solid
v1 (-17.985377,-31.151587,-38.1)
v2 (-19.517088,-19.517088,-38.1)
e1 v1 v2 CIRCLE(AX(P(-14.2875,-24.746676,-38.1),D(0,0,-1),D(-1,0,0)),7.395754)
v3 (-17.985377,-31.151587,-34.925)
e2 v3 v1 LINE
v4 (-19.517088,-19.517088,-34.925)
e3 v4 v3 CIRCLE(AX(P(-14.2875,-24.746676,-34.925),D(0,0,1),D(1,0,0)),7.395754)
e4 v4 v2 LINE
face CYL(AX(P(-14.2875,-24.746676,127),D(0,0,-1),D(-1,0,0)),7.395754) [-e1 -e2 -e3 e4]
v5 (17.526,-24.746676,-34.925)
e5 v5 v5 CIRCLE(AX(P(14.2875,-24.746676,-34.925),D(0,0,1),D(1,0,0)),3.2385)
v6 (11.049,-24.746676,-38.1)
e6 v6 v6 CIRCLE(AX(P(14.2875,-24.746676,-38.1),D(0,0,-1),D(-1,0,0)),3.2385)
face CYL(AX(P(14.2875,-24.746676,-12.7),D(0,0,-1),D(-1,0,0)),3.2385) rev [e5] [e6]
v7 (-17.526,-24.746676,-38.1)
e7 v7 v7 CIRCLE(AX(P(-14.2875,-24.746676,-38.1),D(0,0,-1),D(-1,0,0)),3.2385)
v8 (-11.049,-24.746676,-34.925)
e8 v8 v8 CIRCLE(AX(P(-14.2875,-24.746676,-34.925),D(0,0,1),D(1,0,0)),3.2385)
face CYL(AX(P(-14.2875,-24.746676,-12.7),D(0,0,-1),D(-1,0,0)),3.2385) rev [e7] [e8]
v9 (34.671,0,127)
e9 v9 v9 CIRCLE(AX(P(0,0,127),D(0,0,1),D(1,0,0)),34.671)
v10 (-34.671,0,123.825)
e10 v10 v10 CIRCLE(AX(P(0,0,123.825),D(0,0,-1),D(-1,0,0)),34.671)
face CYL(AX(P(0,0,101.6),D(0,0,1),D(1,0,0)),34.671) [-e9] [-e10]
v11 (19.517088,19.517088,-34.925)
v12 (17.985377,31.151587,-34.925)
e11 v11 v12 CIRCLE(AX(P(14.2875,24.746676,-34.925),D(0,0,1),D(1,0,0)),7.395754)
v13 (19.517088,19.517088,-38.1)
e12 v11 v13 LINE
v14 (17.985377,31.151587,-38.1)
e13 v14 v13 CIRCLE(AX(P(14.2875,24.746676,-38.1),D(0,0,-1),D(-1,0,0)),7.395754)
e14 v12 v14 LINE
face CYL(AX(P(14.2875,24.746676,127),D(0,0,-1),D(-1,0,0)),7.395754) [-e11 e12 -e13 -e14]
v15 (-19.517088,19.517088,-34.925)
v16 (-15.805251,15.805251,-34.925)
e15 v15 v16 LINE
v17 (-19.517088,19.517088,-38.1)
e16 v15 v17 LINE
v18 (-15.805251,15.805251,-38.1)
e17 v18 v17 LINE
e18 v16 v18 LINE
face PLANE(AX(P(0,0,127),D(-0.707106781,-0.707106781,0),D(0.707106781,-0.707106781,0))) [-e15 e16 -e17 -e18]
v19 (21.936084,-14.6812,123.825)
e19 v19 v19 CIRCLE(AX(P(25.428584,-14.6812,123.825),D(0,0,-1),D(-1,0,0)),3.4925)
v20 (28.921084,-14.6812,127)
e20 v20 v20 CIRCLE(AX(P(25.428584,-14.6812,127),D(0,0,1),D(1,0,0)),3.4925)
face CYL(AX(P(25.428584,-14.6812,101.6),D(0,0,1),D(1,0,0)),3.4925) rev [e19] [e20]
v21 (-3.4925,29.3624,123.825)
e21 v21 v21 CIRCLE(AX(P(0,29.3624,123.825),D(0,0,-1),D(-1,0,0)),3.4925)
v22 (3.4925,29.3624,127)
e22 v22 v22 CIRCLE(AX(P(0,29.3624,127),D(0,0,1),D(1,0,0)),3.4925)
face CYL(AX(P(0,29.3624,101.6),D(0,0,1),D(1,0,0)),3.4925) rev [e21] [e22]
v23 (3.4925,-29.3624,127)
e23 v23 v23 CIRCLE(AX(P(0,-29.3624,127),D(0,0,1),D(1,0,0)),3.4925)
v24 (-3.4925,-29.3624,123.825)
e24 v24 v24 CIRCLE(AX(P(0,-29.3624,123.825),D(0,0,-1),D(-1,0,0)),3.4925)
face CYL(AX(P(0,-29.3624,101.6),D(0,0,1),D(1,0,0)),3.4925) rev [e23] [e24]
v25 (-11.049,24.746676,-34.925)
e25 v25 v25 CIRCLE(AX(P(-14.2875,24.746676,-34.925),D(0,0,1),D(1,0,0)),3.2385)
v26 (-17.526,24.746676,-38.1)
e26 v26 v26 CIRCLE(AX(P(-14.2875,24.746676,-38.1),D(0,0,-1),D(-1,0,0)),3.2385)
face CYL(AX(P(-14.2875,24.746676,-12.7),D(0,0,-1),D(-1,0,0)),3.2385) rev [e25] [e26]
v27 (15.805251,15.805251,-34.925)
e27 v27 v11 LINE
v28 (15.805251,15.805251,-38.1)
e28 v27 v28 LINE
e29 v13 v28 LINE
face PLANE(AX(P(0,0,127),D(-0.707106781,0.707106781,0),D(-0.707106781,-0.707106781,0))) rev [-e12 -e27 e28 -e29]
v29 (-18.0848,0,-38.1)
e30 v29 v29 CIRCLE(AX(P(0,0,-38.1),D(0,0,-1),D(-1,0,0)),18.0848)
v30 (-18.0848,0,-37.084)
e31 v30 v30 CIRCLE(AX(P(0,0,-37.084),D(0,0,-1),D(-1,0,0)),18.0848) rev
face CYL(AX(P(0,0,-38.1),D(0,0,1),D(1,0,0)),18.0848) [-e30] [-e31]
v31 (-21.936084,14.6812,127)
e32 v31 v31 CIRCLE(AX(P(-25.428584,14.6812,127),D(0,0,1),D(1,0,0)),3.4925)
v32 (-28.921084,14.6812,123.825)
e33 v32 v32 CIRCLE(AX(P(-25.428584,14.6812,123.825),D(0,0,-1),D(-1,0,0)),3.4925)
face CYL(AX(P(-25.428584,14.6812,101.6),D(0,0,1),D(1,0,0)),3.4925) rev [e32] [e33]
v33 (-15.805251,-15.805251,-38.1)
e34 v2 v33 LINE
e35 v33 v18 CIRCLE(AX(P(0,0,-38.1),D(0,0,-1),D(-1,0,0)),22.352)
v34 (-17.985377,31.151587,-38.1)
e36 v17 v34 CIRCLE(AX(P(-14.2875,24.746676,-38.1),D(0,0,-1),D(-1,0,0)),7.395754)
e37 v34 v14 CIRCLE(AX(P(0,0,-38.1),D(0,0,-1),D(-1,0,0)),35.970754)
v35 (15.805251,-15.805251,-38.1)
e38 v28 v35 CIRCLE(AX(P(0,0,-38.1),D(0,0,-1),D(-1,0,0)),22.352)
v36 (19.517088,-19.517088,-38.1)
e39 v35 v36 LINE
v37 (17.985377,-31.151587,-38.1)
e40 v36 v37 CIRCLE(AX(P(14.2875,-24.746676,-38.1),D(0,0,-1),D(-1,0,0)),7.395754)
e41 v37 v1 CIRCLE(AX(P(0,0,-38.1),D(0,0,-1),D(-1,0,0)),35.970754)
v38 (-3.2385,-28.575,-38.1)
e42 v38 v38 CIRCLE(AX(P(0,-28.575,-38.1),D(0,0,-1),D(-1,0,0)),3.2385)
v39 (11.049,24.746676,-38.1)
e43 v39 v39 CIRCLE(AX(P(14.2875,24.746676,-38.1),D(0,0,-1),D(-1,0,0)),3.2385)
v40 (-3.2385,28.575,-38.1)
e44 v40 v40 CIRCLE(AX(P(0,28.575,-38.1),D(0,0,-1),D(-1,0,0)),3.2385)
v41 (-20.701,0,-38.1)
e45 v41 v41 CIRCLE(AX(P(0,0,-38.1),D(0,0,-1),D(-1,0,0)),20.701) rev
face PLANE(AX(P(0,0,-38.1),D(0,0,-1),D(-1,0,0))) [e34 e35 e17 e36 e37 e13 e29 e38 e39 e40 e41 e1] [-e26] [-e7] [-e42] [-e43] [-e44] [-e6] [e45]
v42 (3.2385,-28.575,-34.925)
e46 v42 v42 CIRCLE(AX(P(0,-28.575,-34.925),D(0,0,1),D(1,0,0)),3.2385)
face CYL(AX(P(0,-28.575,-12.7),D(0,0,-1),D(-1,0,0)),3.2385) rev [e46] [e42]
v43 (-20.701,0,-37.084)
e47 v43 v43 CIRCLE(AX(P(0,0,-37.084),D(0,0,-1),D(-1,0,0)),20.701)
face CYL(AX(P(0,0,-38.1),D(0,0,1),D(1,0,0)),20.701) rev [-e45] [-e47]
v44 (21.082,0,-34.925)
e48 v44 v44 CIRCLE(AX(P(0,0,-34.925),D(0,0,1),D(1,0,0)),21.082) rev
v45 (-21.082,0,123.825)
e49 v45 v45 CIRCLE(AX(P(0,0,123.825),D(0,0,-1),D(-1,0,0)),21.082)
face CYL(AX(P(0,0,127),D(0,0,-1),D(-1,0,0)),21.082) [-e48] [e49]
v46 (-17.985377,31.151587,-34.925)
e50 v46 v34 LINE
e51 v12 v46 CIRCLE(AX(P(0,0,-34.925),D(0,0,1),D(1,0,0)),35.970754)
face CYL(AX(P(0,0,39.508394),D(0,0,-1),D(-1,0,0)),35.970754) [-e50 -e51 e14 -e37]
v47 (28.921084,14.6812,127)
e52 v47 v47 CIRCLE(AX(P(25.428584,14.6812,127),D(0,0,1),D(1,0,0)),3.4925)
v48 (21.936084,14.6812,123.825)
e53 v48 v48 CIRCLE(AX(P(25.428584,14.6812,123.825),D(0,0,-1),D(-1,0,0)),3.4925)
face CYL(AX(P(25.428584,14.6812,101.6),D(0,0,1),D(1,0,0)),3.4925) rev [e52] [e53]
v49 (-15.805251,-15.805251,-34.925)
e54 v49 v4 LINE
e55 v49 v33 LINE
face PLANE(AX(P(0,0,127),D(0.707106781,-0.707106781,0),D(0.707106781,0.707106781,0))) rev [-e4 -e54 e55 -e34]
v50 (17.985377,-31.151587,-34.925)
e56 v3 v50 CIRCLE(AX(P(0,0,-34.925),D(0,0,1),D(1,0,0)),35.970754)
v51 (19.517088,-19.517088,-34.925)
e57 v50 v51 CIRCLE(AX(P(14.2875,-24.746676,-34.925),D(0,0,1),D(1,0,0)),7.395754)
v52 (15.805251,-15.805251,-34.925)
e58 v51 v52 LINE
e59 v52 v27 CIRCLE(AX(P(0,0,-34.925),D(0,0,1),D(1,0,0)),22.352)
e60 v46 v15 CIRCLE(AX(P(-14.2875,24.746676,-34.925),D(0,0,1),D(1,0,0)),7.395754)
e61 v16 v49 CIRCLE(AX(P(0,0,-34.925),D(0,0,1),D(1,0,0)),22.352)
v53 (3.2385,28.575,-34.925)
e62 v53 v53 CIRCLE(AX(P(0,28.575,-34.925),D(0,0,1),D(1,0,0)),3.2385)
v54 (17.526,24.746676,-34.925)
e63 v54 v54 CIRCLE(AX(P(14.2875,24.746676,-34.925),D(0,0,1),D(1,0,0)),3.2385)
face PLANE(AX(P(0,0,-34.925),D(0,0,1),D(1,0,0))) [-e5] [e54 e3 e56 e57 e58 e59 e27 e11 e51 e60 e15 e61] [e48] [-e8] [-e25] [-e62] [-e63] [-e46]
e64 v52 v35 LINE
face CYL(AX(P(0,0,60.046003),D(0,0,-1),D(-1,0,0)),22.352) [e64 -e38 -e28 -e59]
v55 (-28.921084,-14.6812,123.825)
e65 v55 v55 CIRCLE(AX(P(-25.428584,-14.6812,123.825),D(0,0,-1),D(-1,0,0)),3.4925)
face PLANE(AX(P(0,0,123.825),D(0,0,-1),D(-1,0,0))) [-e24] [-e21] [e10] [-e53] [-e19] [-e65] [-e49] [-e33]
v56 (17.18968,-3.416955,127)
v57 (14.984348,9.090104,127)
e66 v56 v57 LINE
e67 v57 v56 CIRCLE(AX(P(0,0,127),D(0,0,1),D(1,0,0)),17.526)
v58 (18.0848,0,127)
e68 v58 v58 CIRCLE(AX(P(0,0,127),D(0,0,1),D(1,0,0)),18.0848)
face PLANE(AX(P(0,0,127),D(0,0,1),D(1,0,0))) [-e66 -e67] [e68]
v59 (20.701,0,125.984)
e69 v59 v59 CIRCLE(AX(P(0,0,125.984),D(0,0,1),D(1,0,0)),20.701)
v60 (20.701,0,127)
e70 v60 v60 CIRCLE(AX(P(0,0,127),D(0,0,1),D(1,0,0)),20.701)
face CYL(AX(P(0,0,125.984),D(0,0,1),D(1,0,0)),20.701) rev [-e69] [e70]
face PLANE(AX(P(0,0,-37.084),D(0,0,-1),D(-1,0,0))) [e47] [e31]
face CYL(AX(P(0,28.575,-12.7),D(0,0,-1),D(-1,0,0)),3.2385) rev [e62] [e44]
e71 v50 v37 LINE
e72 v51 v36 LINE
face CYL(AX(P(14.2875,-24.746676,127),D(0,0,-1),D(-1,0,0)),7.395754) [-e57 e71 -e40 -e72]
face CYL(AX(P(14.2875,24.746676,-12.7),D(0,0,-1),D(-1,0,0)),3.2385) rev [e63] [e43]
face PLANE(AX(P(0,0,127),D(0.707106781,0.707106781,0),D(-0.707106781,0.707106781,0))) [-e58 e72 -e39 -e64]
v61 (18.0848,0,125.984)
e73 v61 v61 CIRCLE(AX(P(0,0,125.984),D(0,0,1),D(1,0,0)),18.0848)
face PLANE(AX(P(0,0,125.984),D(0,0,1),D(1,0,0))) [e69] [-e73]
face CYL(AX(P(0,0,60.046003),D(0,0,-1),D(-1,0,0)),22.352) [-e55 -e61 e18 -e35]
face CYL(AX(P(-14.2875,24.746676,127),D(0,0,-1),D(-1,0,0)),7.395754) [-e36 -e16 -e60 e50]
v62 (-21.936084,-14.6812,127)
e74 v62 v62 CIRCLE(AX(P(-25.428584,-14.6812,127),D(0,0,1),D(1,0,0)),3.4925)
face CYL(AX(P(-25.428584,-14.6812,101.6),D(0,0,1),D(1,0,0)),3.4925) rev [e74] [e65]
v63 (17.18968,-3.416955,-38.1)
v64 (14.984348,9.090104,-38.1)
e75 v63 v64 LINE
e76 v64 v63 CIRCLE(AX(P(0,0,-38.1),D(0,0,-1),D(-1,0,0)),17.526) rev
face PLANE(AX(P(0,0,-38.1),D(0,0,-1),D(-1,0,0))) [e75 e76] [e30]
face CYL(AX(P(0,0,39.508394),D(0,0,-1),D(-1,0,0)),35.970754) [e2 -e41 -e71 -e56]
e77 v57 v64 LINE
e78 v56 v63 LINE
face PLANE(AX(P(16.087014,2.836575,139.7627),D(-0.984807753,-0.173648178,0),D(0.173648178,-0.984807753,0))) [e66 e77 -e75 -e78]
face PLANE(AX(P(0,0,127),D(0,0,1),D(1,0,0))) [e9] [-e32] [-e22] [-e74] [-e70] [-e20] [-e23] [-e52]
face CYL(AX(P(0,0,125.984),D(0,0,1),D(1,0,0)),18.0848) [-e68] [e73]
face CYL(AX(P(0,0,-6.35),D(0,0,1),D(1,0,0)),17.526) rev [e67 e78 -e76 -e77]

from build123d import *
from build123d.topology import SkipClean

# Parameters (mm, degrees)
SKETCH1_R               = 21.082
SKETCH1_R_2             = 17.526
BOSS_EXTRUDE1_DEPTH     = 254
BOSS_EXTRUDE2_START     = 6.35
SKETCH2_R               = 21.082
BOSS_EXTRUDE2_DEPTH     = 6.35
SKETCH3_R               = 25.868376463
CUT_EXTRUDE1_DEPTH      = 127
SKETCH4_R               = 34.925
SKETCH4_R_2             = 19.091061219
BOSS_EXTRUDE3_DEPTH     = 3.175
CUT_EXTRUDE2_DEPTH      = 143.203142546
CIRPATTERN1_COUNT       = 12
SKETCH6_R               = 34.925
SKETCH6_R_2             = 3.175
SKETCH6_R_3             = 21.082
BOSS_EXTRUDE5_DEPTH     = 130.175
SKETCH7_R               = 17.526
CUT_EXTRUDE3_DEPTH      = 143.203142546
SKETCH8_R               = 6.694074497
BOSS_EXTRUDE6_DEPTH     = 6.35
SKETCH9_R               = 62.865218318
SKETCH9_R_2             = 21.082
CUT_EXTRUDE4_DEPTH      = 120.65
SKETCH10_R              = 10.091708754
CUT_EXTRUDE5_DEPTH      = 143.203142546
CUT_EXTRUDE6_START      = -3.175
SKETCH11_R              = 34.925
SKETCH11_R_2            = 21.082
CUT_EXTRUDE6_DEPTH      = 3.175
SKETCH12_R              = 34.925
SKETCH12_R_2            = 21.082
CUT_EXTRUDE7_DEPTH      = 3.175
BOSS_EXTRUDE7_START     = -133.35
SKETCH13_R              = 17.526
SKETCH13_R_2            = 15.875
BOSS_EXTRUDE7_DEPTH     = 133.35
SKETCH14_R              = 21.082
SKETCH14_R_2            = 17.907
CUT_EXTRUDE8_DEPTH      = 127
CUT_EXTRUDE9_DEPTH      = 143.203142546
CUT_EXTRUDE9_DEPTH_BACK = 143.203142546
SKETCH15_R              = 3.175
BOSS_EXTRUDE8_START     = -3.175
BOSS_EXTRUDE8_DEPTH     = 3.175
SKETCH17_R              = 21.082
SKETCH17_R_2            = 17.907
BOSS_EXTRUDE9_DEPTH     = 127
SKETCH18_R              = 17.526
CUT_EXTRUDE10_DEPTH     = 140.808015407
SKETCH19_R              = 20.701
SKETCH19_R_2            = 18.0848
CUT_EXTRUDE11_DEPTH     = 1.016
SKETCH20_R              = 22.352
SKETCH20_R_2            = 20.701
BOSS_EXTRUDE10_DEPTH    = 3.175
CUT_EXTRUDE12_START     = -1.016
SKETCH21_R              = 20.701
SKETCH21_R_2            = 18.0848
CUT_EXTRUDE12_DEPTH     = 1.016
BOSS_EXTRUDE11_START    = -3.175
SKETCH22_R              = 22.352
SKETCH22_R_2            = 21.082
BOSS_EXTRUDE11_DEPTH    = 3.175
SKETCH24_R              = 42.506009091
SKETCH24_R_2            = 34.671
CUT_EXTRUDE13_DEPTH     = 25.4
SKETCH25_R              = 34.671
SKETCH25_R_2            = 22.352
BOSS_EXTRUDE12_DEPTH    = 3.175
CUT_EXTRUDE17_DEPTH     = 3.175
CIRPATTERN3_COUNT       = 6
BOSS_EXTRUDE13_START    = -133.35
BOSS_EXTRUDE13_DEPTH    = 133.35
SKETCH33_R              = 20.701
SKETCH33_R_2            = 18.0848
BOSS_EXTRUDE14_DEPTH    = 31.75
SKETCH35_R              = 18.0848
BOSS_EXTRUDE16_DEPTH    = 31.75
SKETCH36_R              = 3.175
SKETCH36_R_2            = 20.701
BOSS_EXTRUDE17_DEPTH    = 31.75
CUT_EXTRUDE18_OUTLINE_W = 14.888754214
CUT_EXTRUDE18_OUTLINE_H = 31.75
SKETCH38_R              = 3.2385
CUT_EXTRUDE19_DEPTH     = 25.4
SKETCH39_R              = 3.4925
CUT_EXTRUDE20_DEPTH     = 25.4


# Read off the part's stored shape, not the designer's step: Cut-Extrude18
with BuildPart() as part:
    # Sketch1 → Boss-Extrude1 (new body)
    with BuildSketch(Plane.XY):
        Circle(SKETCH1_R)
        Circle(SKETCH1_R_2, mode=Mode.SUBTRACT)
    extrude(amount=BOSS_EXTRUDE1_DEPTH)

    # Sketch2 → Boss-Extrude2 (add)
    with BuildSketch(Plane(origin=(0, 0, 0), x_dir=(-1, 0, 0), z_dir=(0, 0, -1)).offset(BOSS_EXTRUDE2_START)):
        Circle(SKETCH2_R)
    extrude(amount=-BOSS_EXTRUDE2_DEPTH)

    # Sketch3 → Cut-Extrude1 (cut)
    with BuildSketch(Plane.XY.offset(254)):
        Circle(SKETCH3_R)
    extrude(amount=-CUT_EXTRUDE1_DEPTH, mode=Mode.SUBTRACT)

    # Sketch4 → Boss-Extrude3 (add)
    with BuildSketch(Plane.XY.offset(127)):
        Circle(SKETCH4_R)
        Circle(SKETCH4_R_2, mode=Mode.SUBTRACT)
    extrude(amount=-BOSS_EXTRUDE3_DEPTH)

    # Sketch5 → Cut-Extrude2 (cut, through all)
    with BuildSketch(Plane.XY.offset(127)):
        with BuildLine():
            ThreePointArc((0, 31.75), (-3.175, 28.575), (0, 25.4))
            Line((0, 25.4), (0, 31.75))
        make_face()
        with BuildLine():
            Line((0, 31.75), (0, 25.4))
            ThreePointArc((0, 25.4), (2.24506403, 26.32993597), (3.175, 28.575))
            ThreePointArc((3.175, 28.575), (2.24506403, 30.82006403), (0, 31.75))
        make_face()
    cut_extrude2 = extrude(amount=-CUT_EXTRUDE2_DEPTH, mode=Mode.SUBTRACT)

    # CirPattern1: Cut-Extrude2 ×12 about axis
    cirpattern1_axis = Axis((0, 0, 0), (0, 0, 1))
    for i in range(1, CIRPATTERN1_COUNT):
        add(cut_extrude2.rotate(cirpattern1_axis, i * 360 / CIRPATTERN1_COUNT), mode=Mode.SUBTRACT)

    # Sketch6 → Boss-Extrude5 (add)
    with SkipClean():  # the faces are left unmerged after this step: merging them gives an invalid solid
        with BuildSketch(Plane(origin=(0, 0, 123.825), x_dir=(-1, 0, 0), z_dir=(0, 0, -1))):
            with Locations(Location((0, 0, 0), (0, 0, 180))):
                Circle(SKETCH6_R)
            with Locations(Location((-14.2875, -24.746675913, 0), (0, 0, 330))):
                Circle(SKETCH6_R_2, mode=Mode.SUBTRACT)
            with Locations(Location((-24.746675913, -14.2875, 0), (0, 0, 300))):
                Circle(SKETCH6_R_2, mode=Mode.SUBTRACT)
            with Locations(Location((-28.575, 0, 0), (0, 0, 270))):
                Circle(SKETCH6_R_2, mode=Mode.SUBTRACT)
            with Locations((0, -28.575)):
                Circle(SKETCH6_R_2, mode=Mode.SUBTRACT)
            with Locations(Location((14.2875, -24.746675913, 0), (0, 0, 30))):
                Circle(SKETCH6_R_2, mode=Mode.SUBTRACT)
            with Locations(Location((24.746675913, -14.2875, 0), (0, 0, 60))):
                Circle(SKETCH6_R_2, mode=Mode.SUBTRACT)
            with Locations(Location((-24.746675913, 14.2875, 0), (0, 0, 240))):
                Circle(SKETCH6_R_2, mode=Mode.SUBTRACT)
            with Locations(Location((-14.2875, 24.746675913, 0), (0, 0, 210))):
                Circle(SKETCH6_R_2, mode=Mode.SUBTRACT)
            Circle(SKETCH6_R_3, mode=Mode.SUBTRACT)
            with Locations(Location((28.575, 0, 0), (0, 0, 90))):
                Circle(SKETCH6_R_2, mode=Mode.SUBTRACT)
            with Locations(Location((24.746675913, 14.2875, 0), (0, 0, 120))):
                Circle(SKETCH6_R_2, mode=Mode.SUBTRACT)
            with Locations(Location((0, 28.575, 0), (0, 0, 180))):
                Circle(SKETCH6_R_2, mode=Mode.SUBTRACT)
            with Locations(Location((14.2875, 24.746675913, 0), (0, 0, 150))):
                Circle(SKETCH6_R_2, mode=Mode.SUBTRACT)
        extrude(amount=BOSS_EXTRUDE5_DEPTH)

    # Sketch7 → Cut-Extrude3 (cut, through all)
    with SkipClean():  # the faces are left unmerged after this step: merging them gives an invalid solid
        with BuildSketch(Plane(origin=(0, 0, -6.35), x_dir=(-1, 0, 0), z_dir=(0, 0, -1))):
            Circle(SKETCH7_R)
        extrude(amount=-CUT_EXTRUDE3_DEPTH, mode=Mode.SUBTRACT)

    # Sketch9 → Cut-Extrude4 (cut)
    with BuildSketch(Plane(origin=(0, 0, 120.65), x_dir=(-1, 0, 0), z_dir=(0, 0, -1))):
        Circle(SKETCH9_R)
        Circle(SKETCH9_R_2, mode=Mode.SUBTRACT)
    extrude(amount=CUT_EXTRUDE4_DEPTH, mode=Mode.SUBTRACT)

    # Sketch11 → Cut-Extrude6 (cut)
    with BuildSketch(Plane(origin=(0, 0, 120.65), x_dir=(-1, 0, 0), z_dir=(0, 0, -1)).offset(CUT_EXTRUDE6_START)):
        with Locations(Location((0, 0, 0), (0, 0, 180))):
            Circle(SKETCH11_R)
        Circle(SKETCH11_R_2, mode=Mode.SUBTRACT)
    extrude(amount=CUT_EXTRUDE6_DEPTH, mode=Mode.SUBTRACT)

    # Sketch12 → Cut-Extrude7 (cut)
    with BuildSketch(Plane.XY):
        Circle(SKETCH12_R)
        Circle(SKETCH12_R_2, mode=Mode.SUBTRACT)
    extrude(amount=-CUT_EXTRUDE7_DEPTH, mode=Mode.SUBTRACT)

    # Sketch13 → Boss-Extrude7 (add)
    with SkipClean():  # the faces are left unmerged after this step: merging them gives an invalid solid
        with BuildSketch(Plane.XY.offset(127).offset(BOSS_EXTRUDE7_START)):
            Circle(SKETCH13_R)
            Circle(SKETCH13_R_2, mode=Mode.SUBTRACT)
        extrude(amount=BOSS_EXTRUDE7_DEPTH)

    # Sketch14 → Cut-Extrude8 (cut)
    with BuildSketch(Plane(origin=(0, 0, 123.825), x_dir=(-1, 0, 0), z_dir=(0, 0, -1))):
        Circle(SKETCH14_R)
        with Locations(Location((0, 0, 0), (0, 0, 180))):
            Circle(SKETCH14_R_2, mode=Mode.SUBTRACT)
    extrude(amount=CUT_EXTRUDE8_DEPTH, mode=Mode.SUBTRACT)

    # Sketch15 → Cut-Extrude9 (cut, two sides: drawn at the far end of the back side and taken through both)
    # profile 1 of 6: a face of its own
    with BuildSketch(Plane(origin=(0, 0, -6.35), x_dir=(-1, 0, 0), z_dir=(0, 0, -1)).offset(-CUT_EXTRUDE9_DEPTH_BACK)):
        with BuildLine():
            ThreePointArc((-14.907225161, -14.907225161), (-21.082, 0), (-14.907225161, 14.907225161))
            Line((-14.907225161, 14.907225161), (-19.517087957, 19.517087957))
            Line((-19.517087957, 19.517087957), (-24.695704333, 24.695704333))
            ThreePointArc((-24.695704333, 24.695704333), (-34.925, 0), (-24.695704333, -24.695704333))
            Line((-24.695704333, -24.695704333), (-19.517087952, -19.517087952))
            Line((-19.517087952, -19.517087952), (-14.907225161, -14.907225161))
        make_face()
        with Locations((-24.746675913, -14.2875)):
            Circle(SKETCH15_R, mode=Mode.SUBTRACT)
        with Locations((-28.575, 0)):
            Circle(SKETCH15_R, mode=Mode.SUBTRACT)
        with Locations((-24.746675913, 14.2875)):
            Circle(SKETCH15_R, mode=Mode.SUBTRACT)
    # profile 2 of 6: a face of its own
    with BuildSketch(Plane(origin=(0, 0, -6.35), x_dir=(-1, 0, 0), z_dir=(0, 0, -1)).offset(-CUT_EXTRUDE9_DEPTH_BACK)):
        with BuildLine():
            Line((-24.695704333, 24.695704333), (-19.517087957, 19.517087957))
            ThreePointArc((-19.517087957, 19.517087957), (-21.576944301, 23.497203158), (-20.960180597, 27.936113802))
            ThreePointArc((-20.960180597, 27.936113802), (-22.885366953, 26.382107657), (-24.695704333, 24.695704333))
        make_face()
    # profile 3 of 6: a face of its own
    with BuildSketch(Plane(origin=(0, 0, -6.35), x_dir=(-1, 0, 0), z_dir=(0, 0, -1)).offset(-CUT_EXTRUDE9_DEPTH_BACK)):
        with BuildLine():
            ThreePointArc((-20.960180597, -27.936113802), (-21.576944301, -23.497203155), (-19.517087952, -19.517087952))
            Line((-19.517087952, -19.517087952), (-24.695704333, -24.695704333))
            ThreePointArc((-24.695704333, -24.695704333), (-22.885366953, -26.382107657), (-20.960180597, -27.936113802))
        make_face()
    # profile 4 of 6: a face of its own
    with BuildSketch(Plane(origin=(0, 0, -6.35), x_dir=(-1, 0, 0), z_dir=(0, 0, -1)).offset(-CUT_EXTRUDE9_DEPTH_BACK)):
        with BuildLine():
            Line((24.695704333, -24.695704333), (19.517088, -19.517088))
            ThreePointArc((19.517088, -19.517088), (21.120285957, -21.916443334), (21.683254214, -24.746675913))
            ThreePointArc((21.683254214, -24.746675913), (21.500220916, -26.381863173), (20.960180597, -27.936113802))
            ThreePointArc((20.960180597, -27.936113802), (22.885366953, -26.382107657), (24.695704333, -24.695704333))
        make_face()
    # profile 5 of 6: a face of its own
    with BuildSketch(Plane(origin=(0, 0, -6.35), x_dir=(-1, 0, 0), z_dir=(0, 0, -1)).offset(-CUT_EXTRUDE9_DEPTH_BACK)):
        with BuildLine():
            ThreePointArc((14.907225161, 14.907225161), (16.72547512, 12.833908446), (18.257547563, 10.541))
            ThreePointArc((18.257547563, 10.541), (20.36364827, 5.456423109), (21.082, 0))
            ThreePointArc((21.082, 0), (19.477228304, -8.067732121), (14.907225161, -14.907225161))
            Line((14.907225161, -14.907225161), (19.517088, -19.517088))
            Line((19.517088, -19.517088), (24.695704333, -24.695704333))
            ThreePointArc((24.695704333, -24.695704333), (32.266492673, -13.365218875), (34.925, 0))
            ThreePointArc((34.925, 0), (32.266492673, 13.365218875), (24.695704333, 24.695704333))
            Line((24.695704333, 24.695704333), (19.517087973, 19.517087973))
            Line((19.517087973, 19.517087973), (14.907225161, 14.907225161))
        make_face()
        with Locations((24.746675913, -14.2875)):
            Circle(SKETCH15_R, mode=Mode.SUBTRACT)
        with Locations((28.575, 0)):
            Circle(SKETCH15_R, mode=Mode.SUBTRACT)
        with BuildLine():
            ThreePointArc((27.921675913, 14.2875), (25.568426381, 11.220685502), (21.997045256, 12.7))
            ThreePointArc((21.997045256, 12.7), (23.924925445, 17.354314498), (27.921675913, 14.2875))
        make_face(mode=Mode.SUBTRACT)
    # profile 6 of 6: a face of its own
    with BuildSketch(Plane(origin=(0, 0, -6.35), x_dir=(-1, 0, 0), z_dir=(0, 0, -1)).offset(-CUT_EXTRUDE9_DEPTH_BACK)):
        with BuildLine():
            ThreePointArc((21.683254214, 24.746675913), (21.12028595, 21.916443316), (19.517087973, 19.517087973))
            Line((19.517087973, 19.517087973), (24.695704333, 24.695704333))
            ThreePointArc((24.695704333, 24.695704333), (22.885366953, 26.382107657), (20.960180597, 27.936113802))
            ThreePointArc((20.960180597, 27.936113802), (21.500220916, 26.381863173), (21.683254214, 24.746675913))
        make_face()
    extrude(amount=CUT_EXTRUDE9_DEPTH + CUT_EXTRUDE9_DEPTH_BACK, mode=Mode.SUBTRACT)

    # Sketch16 → Boss-Extrude8 (add)
    with BuildSketch(Plane(origin=(0, 0, -6.35), x_dir=(-1, 0, 0), z_dir=(0, 0, -1)).offset(BOSS_EXTRUDE8_START)):
        with BuildLine():
            ThreePointArc((-17.985374262, 31.151588585), (-19.716304798, 29.769151284), (-20.960180597, 27.936113802))
            ThreePointArc((-20.960180597, 27.936113802), (0, 34.925), (20.960180597, 27.936113802))
            ThreePointArc((20.960180597, 27.936113802), (19.716305931, 29.76915006), (17.985377151, 31.151586917))
            ThreePointArc((17.985377151, 31.151586917), (1.668e-06, 35.970754214), (-17.985374262, 31.151588585))
        make_face()
        with BuildLine():
            ThreePointArc((-20.960180597, -27.936113802), (-19.716305978, -29.769150009), (-17.98537727, -31.151586848))
            ThreePointArc((-17.98537727, -31.151586848), (1.298e-06, -35.970754214), (17.985379519, -31.15158555))
            ThreePointArc((17.985379519, -31.15158555), (19.716306859, -29.769149056), (20.960180597, -27.936113802))
            ThreePointArc((20.960180597, -27.936113802), (0, -34.925), (-20.960180597, -27.936113802))
        make_face()
    extrude(amount=BOSS_EXTRUDE8_DEPTH)

    # Sketch17 → Boss-Extrude9 (add)
    with SkipClean():  # the faces are left unmerged after this step: merging them gives an invalid solid
        with BuildSketch(Plane(origin=(0, 0, 123.825), x_dir=(-1, 0, 0), z_dir=(0, 0, -1))):
            with Locations(Location((0, 0, 0), (0, 0, 315))):
                Circle(SKETCH17_R)
            Circle(SKETCH17_R_2, mode=Mode.SUBTRACT)
        extrude(amount=BOSS_EXTRUDE9_DEPTH)

    # Sketch18 → Cut-Extrude10 (cut, through all)
    with SkipClean():  # the faces are left unmerged after this step: merging them gives an invalid solid
        with BuildSketch(Plane.XY.offset(127)):
            Circle(SKETCH18_R)
        extrude(amount=-CUT_EXTRUDE10_DEPTH, mode=Mode.SUBTRACT)

    # Sketch19 → Cut-Extrude11 (cut)
    with SkipClean():  # the faces are left unmerged after this step: merging them gives an invalid solid
        with BuildSketch(Plane.XY.offset(127)):
            Circle(SKETCH19_R)
            Circle(SKETCH19_R_2, mode=Mode.SUBTRACT)
        extrude(amount=-CUT_EXTRUDE11_DEPTH, mode=Mode.SUBTRACT)

    # Sketch20 → Boss-Extrude10 (add)
    with SkipClean():  # the faces are left unmerged after this step: merging them gives an invalid solid
        with BuildSketch(Plane.XY.offset(127)):
            Circle(SKETCH20_R)
            Circle(SKETCH20_R_2, mode=Mode.SUBTRACT)
        extrude(amount=-BOSS_EXTRUDE10_DEPTH)

    # Sketch21 → Cut-Extrude12 (cut)
    with SkipClean():  # the faces are left unmerged after this step: merging them gives an invalid solid
        with BuildSketch(Plane(origin=(0, 0, -6.35), x_dir=(-1, 0, 0), z_dir=(0, 0, -1)).offset(CUT_EXTRUDE12_START)):
            with Locations(Location((0, 0, 0), (0, 0, 180))):
                Circle(SKETCH21_R)
            with Locations(Location((0, 0, 0), (0, 0, 180))):
                Circle(SKETCH21_R_2, mode=Mode.SUBTRACT)
        extrude(amount=CUT_EXTRUDE12_DEPTH, mode=Mode.SUBTRACT)

    # Sketch22 → Boss-Extrude11 (add)
    with BuildSketch(Plane(origin=(0, 0, -6.35), x_dir=(-1, 0, 0), z_dir=(0, 0, -1)).offset(BOSS_EXTRUDE11_START)):
        Circle(SKETCH22_R)
        Circle(SKETCH22_R_2, mode=Mode.SUBTRACT)
    extrude(amount=BOSS_EXTRUDE11_DEPTH)

    # Sketch24 → Cut-Extrude13 (cut)
    with BuildSketch(Plane.XY.offset(127)):
        Circle(SKETCH24_R)
        Circle(SKETCH24_R_2, mode=Mode.SUBTRACT)
    extrude(amount=-CUT_EXTRUDE13_DEPTH, mode=Mode.SUBTRACT)

    # Sketch25 → Boss-Extrude12 (add)
    with BuildSketch(Plane.XY.offset(127)):
        Circle(SKETCH25_R)
        Circle(SKETCH25_R_2, mode=Mode.SUBTRACT)
    extrude(amount=-BOSS_EXTRUDE12_DEPTH)

    # Sketch29 → Cut-Extrude17 (cut)
    with BuildSketch(Plane.XY.offset(127)):
        with BuildLine():
            ThreePointArc((0, 32.7279), (-3.3655, 29.3624), (0, 25.9969))
            Line((0, 25.9969), (0, 32.7279))
        make_face()
        with BuildLine():
            Line((0, 32.7279), (0, 25.9969))
            ThreePointArc((0, 25.9969), (2.379767872, 26.982632128), (3.3655, 29.3624))
            ThreePointArc((3.3655, 29.3624), (2.379767872, 31.742167872), (0, 32.7279))
        make_face()
    cut_extrude17 = extrude(amount=-CUT_EXTRUDE17_DEPTH, mode=Mode.SUBTRACT)

    # CirPattern3: Cut-Extrude17 ×6 about axis
    cirpattern3_axis = Axis((0, 0, 0), (0, 0, 1))
    for i in range(1, CIRPATTERN3_COUNT):
        add(cut_extrude17.rotate(cirpattern3_axis, i * 360 / CIRPATTERN3_COUNT), mode=Mode.SUBTRACT)

    # Sketch31 → Boss-Extrude13 (add)
    with BuildSketch(Plane(origin=(0, 0, -6.35), x_dir=(-1, 0, 0), z_dir=(0, 0, -1)).offset(BOSS_EXTRUDE13_START)):
        with BuildLine():
            ThreePointArc((-14.984348104, 9.090103845), (-17.259740679, 3.043357962), (-17.18967996, -3.416954619))
            Line((-17.18967996, -3.416954619), (-14.984348104, 9.090103845))
        make_face()
    extrude(amount=BOSS_EXTRUDE13_DEPTH)

    # Sketch33 → Boss-Extrude14 (add)
    with BuildSketch(Plane(origin=(0, 0, -5.334), x_dir=(-1, 0, 0), z_dir=(0, 0, -1))):
        with Locations(Location((0, 0, 0), (0, 0, 180))):
            Circle(SKETCH33_R)
        with Locations(Location((0, 0, 0), (0, 0, 180))):
            Circle(SKETCH33_R_2, mode=Mode.SUBTRACT)
    extrude(amount=BOSS_EXTRUDE14_DEPTH)

    # Sketch35 → Boss-Extrude16 (add)
    with BuildSketch(Plane(origin=(0, 0, -6.35), x_dir=(-1, 0, 0), z_dir=(0, 0, -1))):
        with Locations(Location((0, 0, 0), (0, 0, 180))):
            Circle(SKETCH35_R)
        with BuildLine():
            Line((-17.18967996, -3.416954619), (-14.984348104, 9.090103845))
            ThreePointArc((-14.984348104, 9.090103845), (17.259740679, -3.043357962), (-17.18967996, -3.416954619))
        make_face(mode=Mode.SUBTRACT)
    extrude(amount=BOSS_EXTRUDE16_DEPTH)

    # Sketch36 → Boss-Extrude17 (add)
    with BuildSketch(Plane(origin=(0, 0, -6.35), x_dir=(-1, 0, 0), z_dir=(0, 0, -1))):
        with BuildLine():
            ThreePointArc((17.985377107, -31.151586942), (21.619982511, -25.712015549), (19.517087957, -19.517087957))
            Line((19.517087957, -19.517087957), (15.805250773, -15.805250773))
            ThreePointArc((15.805250773, -15.805250773), (22.352, 0), (15.805250773, 15.805250773))
            Line((15.805250773, 15.805250773), (19.517087957, 19.517087957))
            ThreePointArc((19.517087957, 19.517087957), (21.619982511, 25.712015549), (17.985377107, 31.151586942))
            ThreePointArc((17.985377107, 31.151586942), (0, 35.970754214), (-17.985377107, 31.151586942))
            ThreePointArc((-17.985377107, 31.151586942), (-21.619982511, 25.712015549), (-19.517087957, 19.517087957))
            Line((-19.517087957, 19.517087957), (-15.805250773, 15.805250773))
            ThreePointArc((-15.805250773, 15.805250773), (-22.352, 0), (-15.805250773, -15.805250773))
            Line((-15.805250773, -15.805250773), (-19.517087957, -19.517087957))
            ThreePointArc((-19.517087957, -19.517087957), (-21.619982511, -25.712015549), (-17.985377107, -31.151586942))
            ThreePointArc((-17.985377107, -31.151586942), (0, -35.970754214), (17.985377107, -31.151586942))
        make_face()
        with Locations(Location((0, -28.575, 0), (0, 0, 180))):
            Circle(SKETCH36_R, mode=Mode.SUBTRACT)
        with Locations(Location((-14.2875, -24.746675913, 0), (0, 0, 180))):
            Circle(SKETCH36_R, mode=Mode.SUBTRACT)
        with Locations(Location((14.2875, 24.746675913, 0), (0, 0, 180))):
            Circle(SKETCH36_R, mode=Mode.SUBTRACT)
        with Locations(Location((0, 28.575, 0), (0, 0, 180))):
            Circle(SKETCH36_R, mode=Mode.SUBTRACT)
        with Locations(Location((-14.2875, 24.746675913, 0), (0, 0, 180))):
            Circle(SKETCH36_R, mode=Mode.SUBTRACT)
        with Locations(Location((0, 0, 0), (0, 0, 180))):
            Circle(SKETCH36_R_2, mode=Mode.SUBTRACT)
        with Locations(Location((14.2875, -24.746675913, 0), (0, 0, 180))):
            Circle(SKETCH36_R, mode=Mode.SUBTRACT)
    extrude(amount=BOSS_EXTRUDE17_DEPTH)

    # Cut-Extrude18 outline → Cut-Extrude18 (revolve, cut)
    with SkipClean():  # the faces are left unmerged after this step: merging them gives an invalid solid
        with BuildSketch(Plane.XZ):
            with Locations((28.526377107, -19.05)):
                Rectangle(CUT_EXTRUDE18_OUTLINE_W, CUT_EXTRUDE18_OUTLINE_H)
        revolve(axis=Axis((0, 0, 0), (0, 0, 1)), mode=Mode.SUBTRACT)

    # Sketch38 → Cut-Extrude19 (cut)
    with SkipClean():  # the faces are left unmerged after this step: merging them gives an invalid solid
        with BuildSketch(Plane(origin=(0, 0, -38.1), x_dir=(-1, 0, 0), z_dir=(0, 0, -1))):
            with Locations((-14.2875, 24.746675913)):
                Circle(SKETCH38_R)
            with Locations((0, 28.575)):
                Circle(SKETCH38_R)
            with Locations((14.2875, 24.746675913)):
                Circle(SKETCH38_R)
            with Locations((14.2875, -24.746675913)):
                Circle(SKETCH38_R)
            with Locations((0, -28.575)):
                Circle(SKETCH38_R)
            with Locations((-14.2875, -24.746675913)):
                Circle(SKETCH38_R)
        extrude(amount=-CUT_EXTRUDE19_DEPTH, mode=Mode.SUBTRACT)

    # Sketch39 → Cut-Extrude20 (cut)
    with SkipClean():  # the faces are left unmerged after this step: merging them gives an invalid solid
        with BuildSketch(Plane.XY.offset(127)):
            with Locations((0, 29.3624)):
                Circle(SKETCH39_R)
            with Locations((25.428584316, 14.6812)):
                Circle(SKETCH39_R)
            with Locations((25.428584316, -14.6812)):
                Circle(SKETCH39_R)
            with Locations((0, -29.3624)):
                Circle(SKETCH39_R)
            with Locations((-25.428584316, -14.6812)):
                Circle(SKETCH39_R)
            with Locations((-25.428584316, 14.6812)):
                Circle(SKETCH39_R)
        extrude(amount=-CUT_EXTRUDE20_DEPTH, mode=Mode.SUBTRACT)


with BuildPart() as body_2:
    # Sketch8 → Boss-Extrude6 (new body)
    with BuildSketch(Plane.XY.offset(127)):
        Circle(SKETCH8_R)
    extrude(amount=-BOSS_EXTRUDE6_DEPTH)

    # Sketch10 → Cut-Extrude5 (cut, through all)
    with BuildSketch(Plane.XY.offset(127)):
        Circle(SKETCH10_R)
    extrude(amount=-CUT_EXTRUDE5_DEPTH, mode=Mode.SUBTRACT)


solid = part.part
